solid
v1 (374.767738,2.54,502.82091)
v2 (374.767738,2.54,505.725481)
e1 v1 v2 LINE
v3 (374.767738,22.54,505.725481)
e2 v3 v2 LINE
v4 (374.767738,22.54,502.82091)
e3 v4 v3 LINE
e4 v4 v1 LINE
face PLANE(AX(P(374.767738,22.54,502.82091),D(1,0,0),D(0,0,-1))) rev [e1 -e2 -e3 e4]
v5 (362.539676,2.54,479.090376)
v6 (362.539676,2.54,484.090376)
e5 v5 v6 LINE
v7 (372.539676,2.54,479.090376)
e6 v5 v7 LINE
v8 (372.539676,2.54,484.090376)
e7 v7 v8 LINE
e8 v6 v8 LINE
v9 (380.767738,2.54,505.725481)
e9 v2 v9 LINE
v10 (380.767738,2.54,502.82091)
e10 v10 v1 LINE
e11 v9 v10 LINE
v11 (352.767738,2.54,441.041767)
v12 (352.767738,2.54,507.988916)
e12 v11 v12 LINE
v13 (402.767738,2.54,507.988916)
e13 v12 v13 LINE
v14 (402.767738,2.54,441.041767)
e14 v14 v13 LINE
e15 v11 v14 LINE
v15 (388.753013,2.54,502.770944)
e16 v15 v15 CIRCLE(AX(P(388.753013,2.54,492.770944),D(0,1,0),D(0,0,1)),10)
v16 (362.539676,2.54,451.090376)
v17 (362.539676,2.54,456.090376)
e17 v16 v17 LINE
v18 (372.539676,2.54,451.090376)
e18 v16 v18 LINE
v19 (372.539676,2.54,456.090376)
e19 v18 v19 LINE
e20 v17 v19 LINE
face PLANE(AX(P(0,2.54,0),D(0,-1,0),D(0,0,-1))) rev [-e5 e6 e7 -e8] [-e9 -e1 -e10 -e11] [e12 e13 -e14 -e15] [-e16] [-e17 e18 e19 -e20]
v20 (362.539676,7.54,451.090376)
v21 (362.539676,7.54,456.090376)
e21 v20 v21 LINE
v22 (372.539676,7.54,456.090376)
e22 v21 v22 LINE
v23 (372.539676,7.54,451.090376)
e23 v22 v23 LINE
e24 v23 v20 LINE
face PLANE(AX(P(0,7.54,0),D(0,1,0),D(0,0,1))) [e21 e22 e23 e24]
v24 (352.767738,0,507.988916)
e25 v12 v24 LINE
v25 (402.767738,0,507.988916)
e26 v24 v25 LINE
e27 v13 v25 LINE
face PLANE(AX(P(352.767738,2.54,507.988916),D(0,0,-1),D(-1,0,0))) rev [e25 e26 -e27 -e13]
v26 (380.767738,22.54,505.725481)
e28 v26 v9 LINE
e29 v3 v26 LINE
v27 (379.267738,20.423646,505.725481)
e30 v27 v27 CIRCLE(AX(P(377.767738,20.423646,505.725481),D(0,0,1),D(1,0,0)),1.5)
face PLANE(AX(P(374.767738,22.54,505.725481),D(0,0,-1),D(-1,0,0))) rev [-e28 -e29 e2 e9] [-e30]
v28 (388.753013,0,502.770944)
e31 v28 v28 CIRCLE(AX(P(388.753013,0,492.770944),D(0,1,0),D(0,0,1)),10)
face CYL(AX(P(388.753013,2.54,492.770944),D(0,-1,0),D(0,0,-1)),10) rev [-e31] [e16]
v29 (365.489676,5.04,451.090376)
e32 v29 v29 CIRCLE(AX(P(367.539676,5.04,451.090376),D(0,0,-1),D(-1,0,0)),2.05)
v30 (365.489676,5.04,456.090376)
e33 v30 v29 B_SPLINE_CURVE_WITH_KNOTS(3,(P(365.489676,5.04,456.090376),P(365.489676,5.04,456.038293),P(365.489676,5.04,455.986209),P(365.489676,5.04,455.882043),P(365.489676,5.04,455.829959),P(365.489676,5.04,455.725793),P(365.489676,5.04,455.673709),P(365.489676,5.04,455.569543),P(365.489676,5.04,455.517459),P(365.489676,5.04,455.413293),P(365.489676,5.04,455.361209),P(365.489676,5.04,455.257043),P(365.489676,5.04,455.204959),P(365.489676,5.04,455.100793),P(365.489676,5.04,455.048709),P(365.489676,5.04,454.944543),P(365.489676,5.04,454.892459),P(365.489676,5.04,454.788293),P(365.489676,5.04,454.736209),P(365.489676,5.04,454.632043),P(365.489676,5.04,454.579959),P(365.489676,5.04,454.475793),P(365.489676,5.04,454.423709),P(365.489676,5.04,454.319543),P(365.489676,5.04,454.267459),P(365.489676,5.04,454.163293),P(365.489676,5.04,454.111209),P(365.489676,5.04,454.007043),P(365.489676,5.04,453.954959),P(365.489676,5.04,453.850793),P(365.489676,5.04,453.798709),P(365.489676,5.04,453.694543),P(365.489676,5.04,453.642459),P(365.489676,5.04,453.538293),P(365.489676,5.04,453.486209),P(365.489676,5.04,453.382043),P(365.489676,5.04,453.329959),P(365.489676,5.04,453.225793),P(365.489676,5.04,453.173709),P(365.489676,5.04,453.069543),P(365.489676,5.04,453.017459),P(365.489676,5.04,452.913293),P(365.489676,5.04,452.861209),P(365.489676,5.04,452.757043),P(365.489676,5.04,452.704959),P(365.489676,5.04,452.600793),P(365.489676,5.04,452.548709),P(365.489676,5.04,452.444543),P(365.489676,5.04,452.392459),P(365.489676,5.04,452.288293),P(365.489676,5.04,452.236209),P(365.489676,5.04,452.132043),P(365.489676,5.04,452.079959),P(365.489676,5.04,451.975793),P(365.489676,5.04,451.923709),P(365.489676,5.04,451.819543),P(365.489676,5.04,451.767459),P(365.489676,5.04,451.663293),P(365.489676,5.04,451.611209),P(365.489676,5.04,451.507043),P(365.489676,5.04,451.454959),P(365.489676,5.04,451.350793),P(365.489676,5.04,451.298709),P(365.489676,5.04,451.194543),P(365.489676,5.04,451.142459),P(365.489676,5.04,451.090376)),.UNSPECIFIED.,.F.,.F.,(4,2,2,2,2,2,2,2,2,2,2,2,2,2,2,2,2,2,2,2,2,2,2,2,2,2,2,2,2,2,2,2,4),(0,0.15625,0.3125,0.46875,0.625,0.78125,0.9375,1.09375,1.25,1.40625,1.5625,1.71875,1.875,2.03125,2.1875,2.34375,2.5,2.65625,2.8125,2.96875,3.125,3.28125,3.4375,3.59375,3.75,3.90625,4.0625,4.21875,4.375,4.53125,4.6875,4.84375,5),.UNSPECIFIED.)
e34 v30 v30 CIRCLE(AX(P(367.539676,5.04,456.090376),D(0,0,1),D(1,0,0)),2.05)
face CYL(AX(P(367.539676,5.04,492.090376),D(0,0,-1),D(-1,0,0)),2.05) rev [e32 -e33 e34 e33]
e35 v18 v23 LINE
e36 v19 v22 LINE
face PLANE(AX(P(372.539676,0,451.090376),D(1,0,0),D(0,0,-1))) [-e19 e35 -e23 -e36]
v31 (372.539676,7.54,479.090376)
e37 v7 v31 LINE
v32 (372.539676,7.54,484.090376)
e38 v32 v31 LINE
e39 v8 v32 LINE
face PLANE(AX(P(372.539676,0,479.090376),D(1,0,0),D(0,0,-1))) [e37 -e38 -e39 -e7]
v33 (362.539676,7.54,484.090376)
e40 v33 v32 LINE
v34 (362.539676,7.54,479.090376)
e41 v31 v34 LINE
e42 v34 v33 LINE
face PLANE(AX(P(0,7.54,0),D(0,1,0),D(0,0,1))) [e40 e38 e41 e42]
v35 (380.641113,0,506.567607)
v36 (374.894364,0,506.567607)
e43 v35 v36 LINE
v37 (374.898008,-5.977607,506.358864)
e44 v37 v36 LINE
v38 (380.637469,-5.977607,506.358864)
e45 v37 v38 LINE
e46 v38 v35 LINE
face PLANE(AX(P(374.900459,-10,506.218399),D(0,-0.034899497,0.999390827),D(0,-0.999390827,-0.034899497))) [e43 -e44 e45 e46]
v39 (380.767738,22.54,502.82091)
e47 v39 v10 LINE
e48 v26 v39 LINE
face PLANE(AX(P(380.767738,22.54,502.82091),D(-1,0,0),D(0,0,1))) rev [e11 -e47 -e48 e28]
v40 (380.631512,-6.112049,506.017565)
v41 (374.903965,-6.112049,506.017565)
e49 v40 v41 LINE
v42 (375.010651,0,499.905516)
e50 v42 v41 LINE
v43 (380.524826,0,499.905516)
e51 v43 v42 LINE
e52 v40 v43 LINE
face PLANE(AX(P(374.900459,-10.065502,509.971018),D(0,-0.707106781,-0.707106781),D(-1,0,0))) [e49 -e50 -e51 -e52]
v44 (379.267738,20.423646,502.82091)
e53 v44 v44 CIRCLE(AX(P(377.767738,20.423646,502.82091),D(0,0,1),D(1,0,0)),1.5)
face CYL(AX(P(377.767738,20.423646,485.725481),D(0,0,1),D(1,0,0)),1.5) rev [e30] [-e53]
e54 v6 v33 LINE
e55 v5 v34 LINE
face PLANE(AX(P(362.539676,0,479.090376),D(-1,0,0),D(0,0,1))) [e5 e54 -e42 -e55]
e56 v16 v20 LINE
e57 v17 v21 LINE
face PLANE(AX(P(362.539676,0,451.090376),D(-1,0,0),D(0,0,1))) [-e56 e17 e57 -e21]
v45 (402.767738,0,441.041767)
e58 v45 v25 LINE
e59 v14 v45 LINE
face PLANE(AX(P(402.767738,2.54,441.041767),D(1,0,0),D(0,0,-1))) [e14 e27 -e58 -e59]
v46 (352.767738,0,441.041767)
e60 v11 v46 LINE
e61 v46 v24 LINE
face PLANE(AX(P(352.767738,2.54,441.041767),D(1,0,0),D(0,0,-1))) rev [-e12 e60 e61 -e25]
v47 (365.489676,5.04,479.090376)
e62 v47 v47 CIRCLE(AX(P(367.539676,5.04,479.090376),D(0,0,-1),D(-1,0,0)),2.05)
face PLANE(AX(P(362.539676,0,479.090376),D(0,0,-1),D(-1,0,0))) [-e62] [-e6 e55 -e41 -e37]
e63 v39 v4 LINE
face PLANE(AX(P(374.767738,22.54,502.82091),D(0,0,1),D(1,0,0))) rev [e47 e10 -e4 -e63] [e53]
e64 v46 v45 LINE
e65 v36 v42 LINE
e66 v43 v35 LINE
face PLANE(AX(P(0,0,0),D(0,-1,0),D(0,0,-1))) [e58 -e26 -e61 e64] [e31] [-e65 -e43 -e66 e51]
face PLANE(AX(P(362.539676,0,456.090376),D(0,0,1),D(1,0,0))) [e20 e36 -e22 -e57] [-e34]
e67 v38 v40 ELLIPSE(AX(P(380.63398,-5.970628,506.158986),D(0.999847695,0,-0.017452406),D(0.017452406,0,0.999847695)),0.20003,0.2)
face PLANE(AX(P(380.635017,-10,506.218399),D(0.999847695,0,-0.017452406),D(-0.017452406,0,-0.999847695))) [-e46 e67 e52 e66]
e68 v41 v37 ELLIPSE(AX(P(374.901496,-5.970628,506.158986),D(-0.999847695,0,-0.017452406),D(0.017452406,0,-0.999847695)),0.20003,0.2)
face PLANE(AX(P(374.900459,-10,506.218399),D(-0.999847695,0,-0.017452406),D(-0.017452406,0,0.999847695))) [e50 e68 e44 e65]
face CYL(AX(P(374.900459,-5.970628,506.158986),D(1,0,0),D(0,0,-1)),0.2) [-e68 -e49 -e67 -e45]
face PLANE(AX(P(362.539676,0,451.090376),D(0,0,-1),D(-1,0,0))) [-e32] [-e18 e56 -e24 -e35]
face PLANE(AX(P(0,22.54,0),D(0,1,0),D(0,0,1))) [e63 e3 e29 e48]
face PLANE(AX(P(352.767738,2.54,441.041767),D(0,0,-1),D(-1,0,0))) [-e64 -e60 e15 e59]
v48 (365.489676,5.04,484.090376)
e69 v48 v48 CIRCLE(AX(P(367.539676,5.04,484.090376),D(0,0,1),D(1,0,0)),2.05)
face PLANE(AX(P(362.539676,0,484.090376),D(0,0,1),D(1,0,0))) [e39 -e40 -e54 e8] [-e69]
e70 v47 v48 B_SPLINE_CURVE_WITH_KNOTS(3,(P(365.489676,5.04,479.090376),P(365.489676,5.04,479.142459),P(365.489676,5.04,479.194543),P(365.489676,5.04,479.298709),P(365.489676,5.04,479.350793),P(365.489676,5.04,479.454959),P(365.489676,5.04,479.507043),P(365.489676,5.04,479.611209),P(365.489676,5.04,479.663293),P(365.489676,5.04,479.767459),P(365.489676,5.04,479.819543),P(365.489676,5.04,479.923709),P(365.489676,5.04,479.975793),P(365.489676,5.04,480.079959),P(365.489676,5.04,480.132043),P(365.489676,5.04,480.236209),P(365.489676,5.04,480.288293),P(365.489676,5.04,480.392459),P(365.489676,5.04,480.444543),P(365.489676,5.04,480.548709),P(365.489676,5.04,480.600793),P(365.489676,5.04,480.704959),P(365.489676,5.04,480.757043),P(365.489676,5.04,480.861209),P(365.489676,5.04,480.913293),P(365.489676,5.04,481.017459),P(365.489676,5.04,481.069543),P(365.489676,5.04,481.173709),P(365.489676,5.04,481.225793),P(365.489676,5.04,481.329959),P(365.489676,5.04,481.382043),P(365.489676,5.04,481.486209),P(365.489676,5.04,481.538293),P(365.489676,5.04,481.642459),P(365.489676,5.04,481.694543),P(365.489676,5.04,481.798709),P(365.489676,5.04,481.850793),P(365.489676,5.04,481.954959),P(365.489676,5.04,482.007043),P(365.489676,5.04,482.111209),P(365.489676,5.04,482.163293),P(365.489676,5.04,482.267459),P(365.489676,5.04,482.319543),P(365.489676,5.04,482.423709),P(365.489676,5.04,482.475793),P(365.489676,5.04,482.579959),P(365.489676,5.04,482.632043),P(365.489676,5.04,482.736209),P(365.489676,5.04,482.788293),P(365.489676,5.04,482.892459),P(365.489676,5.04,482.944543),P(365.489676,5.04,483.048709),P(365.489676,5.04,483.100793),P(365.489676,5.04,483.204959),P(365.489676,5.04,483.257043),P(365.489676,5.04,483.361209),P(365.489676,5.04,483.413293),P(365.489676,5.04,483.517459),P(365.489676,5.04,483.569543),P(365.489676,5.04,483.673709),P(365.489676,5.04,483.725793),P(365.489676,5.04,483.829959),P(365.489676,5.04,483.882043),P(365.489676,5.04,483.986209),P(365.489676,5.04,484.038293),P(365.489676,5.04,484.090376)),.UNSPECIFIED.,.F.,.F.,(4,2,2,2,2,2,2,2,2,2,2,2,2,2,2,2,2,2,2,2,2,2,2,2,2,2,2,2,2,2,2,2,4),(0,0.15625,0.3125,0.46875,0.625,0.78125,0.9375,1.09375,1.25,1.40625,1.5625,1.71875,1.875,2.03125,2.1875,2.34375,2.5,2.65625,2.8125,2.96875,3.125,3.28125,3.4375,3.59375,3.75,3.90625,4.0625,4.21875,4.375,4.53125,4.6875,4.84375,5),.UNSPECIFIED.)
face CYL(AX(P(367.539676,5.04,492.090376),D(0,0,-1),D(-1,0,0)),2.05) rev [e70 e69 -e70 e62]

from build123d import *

# Parameters (mm, degrees)
SKETCH1_W                = 50
SKETCH1_H                = 66.947148402
SKETCH1_R                = 10
SKETCH1_W_2              = 10
SKETCH1_H_2              = 5
BOSS_EXTRUDE1_DEPTH      = 2.54
BOSS_EXTRUDE2_DEPTH      = 5
BOSS_EXTRUDE2_DEPTH_BACK = 2.54
SKETCH2_W                = 10
SKETCH2_H                = 5
SKETCH3_R                = 2.05
CUT_EXTRUDE1_DEPTH       = 41
SKETCH4_W                = 6
SKETCH4_H                = 2.904570335
BOSS_EXTRUDE3_DEPTH      = 20
SKETCH5_R                = 1.5
CUT_EXTRUDE2_DEPTH       = 20
SKETCH6_W                = 5.734558075
SKETCH6_H                = 6.4250327
BOSS_EXTRUDE4_DEPTH      = 10
DRAFT1_ANGLE             = -1
DRAFT2_START             = 371.742315671
DRAFT2_OUTLINE_W         = 10
DRAFT2_OUTLINE_H         = 6.426011413
DRAFT2_DEPTH             = 1.257684329
DRAFT3_START             = -2
DRAFT3_OUTLINE_W         = 9
DRAFT3_OUTLINE_H         = 10
DRAFT3_DEPTH             = 0.836252296
DRAFT4_ANGLE             = 1
CHAMFER1_SIZE            = 10
CHAMFER1_SIZE_2          = 10.179201911
FILLET2_R                = 0.2


with BuildPart() as part:
    # Sketch1 → Boss-Extrude1 (new body)
    with BuildSketch(Plane(origin=(0, 0, 0), x_dir=(1, 0, 0), z_dir=(0, 1, 0))):
        with Locations((377.767738439, -474.515341444)):
            Rectangle(SKETCH1_W, SKETCH1_H)
        with Locations(Location((388.753012651, -492.770944419, 0), (0, 0, 270))):
            Circle(SKETCH1_R, mode=Mode.SUBTRACT)
        with Locations((367.539675888, -481.590375858)):
            Rectangle(SKETCH1_W_2, SKETCH1_H_2, mode=Mode.SUBTRACT)
        with Locations((367.539675888, -453.590375858)):
            Rectangle(SKETCH1_W_2, SKETCH1_H_2, mode=Mode.SUBTRACT)
    extrude(amount=BOSS_EXTRUDE1_DEPTH)

    # Sketch2 → Boss-Extrude2 (add, two sides: drawn at the far end of the back side and taken through both)
    with BuildSketch(Plane(origin=(0, 2.54, 0), x_dir=(1, 0, 0), z_dir=(0, 1, 0)).offset(-BOSS_EXTRUDE2_DEPTH_BACK)):
        with Locations((367.539675888, -453.590375858)):
            Rectangle(SKETCH2_W, SKETCH2_H)
        with Locations((367.539675888, -481.590375858)):
            Rectangle(SKETCH2_W, SKETCH2_H)
    extrude(amount=BOSS_EXTRUDE2_DEPTH + BOSS_EXTRUDE2_DEPTH_BACK)

    # Sketch3 → Cut-Extrude1 (cut)
    with BuildSketch(Plane(origin=(0, 0, 451.090375858), x_dir=(-1, 0, 0), z_dir=(0, 0, -1))):
        with Locations((-367.539675888, 5.04)):
            Circle(SKETCH3_R)
    extrude(amount=-CUT_EXTRUDE1_DEPTH, mode=Mode.SUBTRACT)

    # Sketch4 → Boss-Extrude3 (add)
    with BuildSketch(Plane(origin=(0, 2.54, 0), x_dir=(1, 0, 0), z_dir=(0, 1, 0))):
        with Locations((377.767738439, -504.273195611)):
            Rectangle(SKETCH4_W, SKETCH4_H)
    extrude(amount=BOSS_EXTRUDE3_DEPTH)

    # Sketch5 → Cut-Extrude2 (cut)
    with BuildSketch(Plane.XY.offset(505.725480778)):
        with Locations((377.767738439, 20.423645689)):
            Circle(SKETCH5_R)
    extrude(amount=-CUT_EXTRUDE2_DEPTH, mode=Mode.SUBTRACT)

    # Sketch6 → Boss-Extrude4 (add)
    with BuildSketch(Plane(origin=(0, 0, 0), x_dir=(-1, 0, 0), z_dir=(0, -1, 0))):
        with Locations((-377.767738439, -503.005882789)):
            Rectangle(SKETCH6_W, SKETCH6_H)
    extrude(amount=BOSS_EXTRUDE4_DEPTH)

    # Draft1
    draft1_faces = [part.faces().sort_by_distance(p)[0] for p in [
        (374.900459401, -5, 503.005882789),
    ]]
    draft(draft1_faces, Plane(origin=(374.900459401, -10, 506.218399139), x_dir=(1, 0, 0), z_dir=(0, 0, 1)), DRAFT1_ANGLE)

    # Draft2: read off the stored shape, not the designer's step
    # Draft2 outline → Draft2 (cut)
    with BuildSketch(Plane(origin=(0, 0, 0), x_dir=(0, 1, 0), z_dir=(0.9998476951563913, 0, -0.017452406437283505)).offset(DRAFT2_START)):
        with Locations((-5, 509.571290948)):
            Rectangle(DRAFT2_OUTLINE_W, DRAFT2_OUTLINE_H)
    extrude(amount=DRAFT2_DEPTH, mode=Mode.SUBTRACT)

    # Draft3: read off the stored shape, not the designer's step
    # Draft3 outline → Draft3 (cut)
    with BuildSketch(Plane(origin=(0, 0, 0), x_dir=(1, 0, 0), z_dir=(0, 0.9998476951563913, 0.017452406437283505)).offset(DRAFT3_START)):
        with Locations((377.5, -503)):
            Rectangle(DRAFT3_OUTLINE_W, DRAFT3_OUTLINE_H)
    extrude(amount=DRAFT3_DEPTH, mode=Mode.SUBTRACT)

    # Draft4
    draft4_faces = [part.faces().sort_by_distance(p)[0] for p in [
        (377.767738439, -5, 506.218399139),
    ]]
    draft(draft4_faces, Plane(origin=(374.900459401, -10, 506.218399139), x_dir=(0, 0.017452406437283553, -0.9998476951563913), z_dir=(0, -0.9998476951563913, -0.017452406437283553)), DRAFT4_ANGLE)

    # Chamfer1
    # the kernel refuses this chamfer: 10.179201911, 10 mm, written as the material it takes off along each edge
    with BuildSketch(Plane(origin=(348.822826033, -9.887850637, 499.793366439), x_dir=(0, 1, 0), z_dir=(1, 0, 0))) as chamfer1_piece_1_section:
        Polygon((CHAMFER1_SIZE, 0), (-CHAMFER1_SIZE_2 * 0.0174524064368, CHAMFER1_SIZE_2 * 0.999847695128), (0, 0), align=None)
    chamfer1_piece_1 = extrude(amount=57.889824811, mode=Mode.PRIVATE)
    chamfer1_piece_1 = split(chamfer1_piece_1, bisect_by=Plane(origin=(348.822826033, 0, 499.793366439), z_dir=(0, -1, 0)), keep=Keep.TOP, mode=Mode.PRIVATE)
    add(chamfer1_piece_1, mode=Mode.SUBTRACT)

    # Fillet2
    fillet2_edges = [part.edges().sort_by_distance(p)[0] for p in [
        (377.767738438, -6.437295713, 506.342811514),
    ]]
    fillet(fillet2_edges, radius=FILLET2_R)


solid = part.part
